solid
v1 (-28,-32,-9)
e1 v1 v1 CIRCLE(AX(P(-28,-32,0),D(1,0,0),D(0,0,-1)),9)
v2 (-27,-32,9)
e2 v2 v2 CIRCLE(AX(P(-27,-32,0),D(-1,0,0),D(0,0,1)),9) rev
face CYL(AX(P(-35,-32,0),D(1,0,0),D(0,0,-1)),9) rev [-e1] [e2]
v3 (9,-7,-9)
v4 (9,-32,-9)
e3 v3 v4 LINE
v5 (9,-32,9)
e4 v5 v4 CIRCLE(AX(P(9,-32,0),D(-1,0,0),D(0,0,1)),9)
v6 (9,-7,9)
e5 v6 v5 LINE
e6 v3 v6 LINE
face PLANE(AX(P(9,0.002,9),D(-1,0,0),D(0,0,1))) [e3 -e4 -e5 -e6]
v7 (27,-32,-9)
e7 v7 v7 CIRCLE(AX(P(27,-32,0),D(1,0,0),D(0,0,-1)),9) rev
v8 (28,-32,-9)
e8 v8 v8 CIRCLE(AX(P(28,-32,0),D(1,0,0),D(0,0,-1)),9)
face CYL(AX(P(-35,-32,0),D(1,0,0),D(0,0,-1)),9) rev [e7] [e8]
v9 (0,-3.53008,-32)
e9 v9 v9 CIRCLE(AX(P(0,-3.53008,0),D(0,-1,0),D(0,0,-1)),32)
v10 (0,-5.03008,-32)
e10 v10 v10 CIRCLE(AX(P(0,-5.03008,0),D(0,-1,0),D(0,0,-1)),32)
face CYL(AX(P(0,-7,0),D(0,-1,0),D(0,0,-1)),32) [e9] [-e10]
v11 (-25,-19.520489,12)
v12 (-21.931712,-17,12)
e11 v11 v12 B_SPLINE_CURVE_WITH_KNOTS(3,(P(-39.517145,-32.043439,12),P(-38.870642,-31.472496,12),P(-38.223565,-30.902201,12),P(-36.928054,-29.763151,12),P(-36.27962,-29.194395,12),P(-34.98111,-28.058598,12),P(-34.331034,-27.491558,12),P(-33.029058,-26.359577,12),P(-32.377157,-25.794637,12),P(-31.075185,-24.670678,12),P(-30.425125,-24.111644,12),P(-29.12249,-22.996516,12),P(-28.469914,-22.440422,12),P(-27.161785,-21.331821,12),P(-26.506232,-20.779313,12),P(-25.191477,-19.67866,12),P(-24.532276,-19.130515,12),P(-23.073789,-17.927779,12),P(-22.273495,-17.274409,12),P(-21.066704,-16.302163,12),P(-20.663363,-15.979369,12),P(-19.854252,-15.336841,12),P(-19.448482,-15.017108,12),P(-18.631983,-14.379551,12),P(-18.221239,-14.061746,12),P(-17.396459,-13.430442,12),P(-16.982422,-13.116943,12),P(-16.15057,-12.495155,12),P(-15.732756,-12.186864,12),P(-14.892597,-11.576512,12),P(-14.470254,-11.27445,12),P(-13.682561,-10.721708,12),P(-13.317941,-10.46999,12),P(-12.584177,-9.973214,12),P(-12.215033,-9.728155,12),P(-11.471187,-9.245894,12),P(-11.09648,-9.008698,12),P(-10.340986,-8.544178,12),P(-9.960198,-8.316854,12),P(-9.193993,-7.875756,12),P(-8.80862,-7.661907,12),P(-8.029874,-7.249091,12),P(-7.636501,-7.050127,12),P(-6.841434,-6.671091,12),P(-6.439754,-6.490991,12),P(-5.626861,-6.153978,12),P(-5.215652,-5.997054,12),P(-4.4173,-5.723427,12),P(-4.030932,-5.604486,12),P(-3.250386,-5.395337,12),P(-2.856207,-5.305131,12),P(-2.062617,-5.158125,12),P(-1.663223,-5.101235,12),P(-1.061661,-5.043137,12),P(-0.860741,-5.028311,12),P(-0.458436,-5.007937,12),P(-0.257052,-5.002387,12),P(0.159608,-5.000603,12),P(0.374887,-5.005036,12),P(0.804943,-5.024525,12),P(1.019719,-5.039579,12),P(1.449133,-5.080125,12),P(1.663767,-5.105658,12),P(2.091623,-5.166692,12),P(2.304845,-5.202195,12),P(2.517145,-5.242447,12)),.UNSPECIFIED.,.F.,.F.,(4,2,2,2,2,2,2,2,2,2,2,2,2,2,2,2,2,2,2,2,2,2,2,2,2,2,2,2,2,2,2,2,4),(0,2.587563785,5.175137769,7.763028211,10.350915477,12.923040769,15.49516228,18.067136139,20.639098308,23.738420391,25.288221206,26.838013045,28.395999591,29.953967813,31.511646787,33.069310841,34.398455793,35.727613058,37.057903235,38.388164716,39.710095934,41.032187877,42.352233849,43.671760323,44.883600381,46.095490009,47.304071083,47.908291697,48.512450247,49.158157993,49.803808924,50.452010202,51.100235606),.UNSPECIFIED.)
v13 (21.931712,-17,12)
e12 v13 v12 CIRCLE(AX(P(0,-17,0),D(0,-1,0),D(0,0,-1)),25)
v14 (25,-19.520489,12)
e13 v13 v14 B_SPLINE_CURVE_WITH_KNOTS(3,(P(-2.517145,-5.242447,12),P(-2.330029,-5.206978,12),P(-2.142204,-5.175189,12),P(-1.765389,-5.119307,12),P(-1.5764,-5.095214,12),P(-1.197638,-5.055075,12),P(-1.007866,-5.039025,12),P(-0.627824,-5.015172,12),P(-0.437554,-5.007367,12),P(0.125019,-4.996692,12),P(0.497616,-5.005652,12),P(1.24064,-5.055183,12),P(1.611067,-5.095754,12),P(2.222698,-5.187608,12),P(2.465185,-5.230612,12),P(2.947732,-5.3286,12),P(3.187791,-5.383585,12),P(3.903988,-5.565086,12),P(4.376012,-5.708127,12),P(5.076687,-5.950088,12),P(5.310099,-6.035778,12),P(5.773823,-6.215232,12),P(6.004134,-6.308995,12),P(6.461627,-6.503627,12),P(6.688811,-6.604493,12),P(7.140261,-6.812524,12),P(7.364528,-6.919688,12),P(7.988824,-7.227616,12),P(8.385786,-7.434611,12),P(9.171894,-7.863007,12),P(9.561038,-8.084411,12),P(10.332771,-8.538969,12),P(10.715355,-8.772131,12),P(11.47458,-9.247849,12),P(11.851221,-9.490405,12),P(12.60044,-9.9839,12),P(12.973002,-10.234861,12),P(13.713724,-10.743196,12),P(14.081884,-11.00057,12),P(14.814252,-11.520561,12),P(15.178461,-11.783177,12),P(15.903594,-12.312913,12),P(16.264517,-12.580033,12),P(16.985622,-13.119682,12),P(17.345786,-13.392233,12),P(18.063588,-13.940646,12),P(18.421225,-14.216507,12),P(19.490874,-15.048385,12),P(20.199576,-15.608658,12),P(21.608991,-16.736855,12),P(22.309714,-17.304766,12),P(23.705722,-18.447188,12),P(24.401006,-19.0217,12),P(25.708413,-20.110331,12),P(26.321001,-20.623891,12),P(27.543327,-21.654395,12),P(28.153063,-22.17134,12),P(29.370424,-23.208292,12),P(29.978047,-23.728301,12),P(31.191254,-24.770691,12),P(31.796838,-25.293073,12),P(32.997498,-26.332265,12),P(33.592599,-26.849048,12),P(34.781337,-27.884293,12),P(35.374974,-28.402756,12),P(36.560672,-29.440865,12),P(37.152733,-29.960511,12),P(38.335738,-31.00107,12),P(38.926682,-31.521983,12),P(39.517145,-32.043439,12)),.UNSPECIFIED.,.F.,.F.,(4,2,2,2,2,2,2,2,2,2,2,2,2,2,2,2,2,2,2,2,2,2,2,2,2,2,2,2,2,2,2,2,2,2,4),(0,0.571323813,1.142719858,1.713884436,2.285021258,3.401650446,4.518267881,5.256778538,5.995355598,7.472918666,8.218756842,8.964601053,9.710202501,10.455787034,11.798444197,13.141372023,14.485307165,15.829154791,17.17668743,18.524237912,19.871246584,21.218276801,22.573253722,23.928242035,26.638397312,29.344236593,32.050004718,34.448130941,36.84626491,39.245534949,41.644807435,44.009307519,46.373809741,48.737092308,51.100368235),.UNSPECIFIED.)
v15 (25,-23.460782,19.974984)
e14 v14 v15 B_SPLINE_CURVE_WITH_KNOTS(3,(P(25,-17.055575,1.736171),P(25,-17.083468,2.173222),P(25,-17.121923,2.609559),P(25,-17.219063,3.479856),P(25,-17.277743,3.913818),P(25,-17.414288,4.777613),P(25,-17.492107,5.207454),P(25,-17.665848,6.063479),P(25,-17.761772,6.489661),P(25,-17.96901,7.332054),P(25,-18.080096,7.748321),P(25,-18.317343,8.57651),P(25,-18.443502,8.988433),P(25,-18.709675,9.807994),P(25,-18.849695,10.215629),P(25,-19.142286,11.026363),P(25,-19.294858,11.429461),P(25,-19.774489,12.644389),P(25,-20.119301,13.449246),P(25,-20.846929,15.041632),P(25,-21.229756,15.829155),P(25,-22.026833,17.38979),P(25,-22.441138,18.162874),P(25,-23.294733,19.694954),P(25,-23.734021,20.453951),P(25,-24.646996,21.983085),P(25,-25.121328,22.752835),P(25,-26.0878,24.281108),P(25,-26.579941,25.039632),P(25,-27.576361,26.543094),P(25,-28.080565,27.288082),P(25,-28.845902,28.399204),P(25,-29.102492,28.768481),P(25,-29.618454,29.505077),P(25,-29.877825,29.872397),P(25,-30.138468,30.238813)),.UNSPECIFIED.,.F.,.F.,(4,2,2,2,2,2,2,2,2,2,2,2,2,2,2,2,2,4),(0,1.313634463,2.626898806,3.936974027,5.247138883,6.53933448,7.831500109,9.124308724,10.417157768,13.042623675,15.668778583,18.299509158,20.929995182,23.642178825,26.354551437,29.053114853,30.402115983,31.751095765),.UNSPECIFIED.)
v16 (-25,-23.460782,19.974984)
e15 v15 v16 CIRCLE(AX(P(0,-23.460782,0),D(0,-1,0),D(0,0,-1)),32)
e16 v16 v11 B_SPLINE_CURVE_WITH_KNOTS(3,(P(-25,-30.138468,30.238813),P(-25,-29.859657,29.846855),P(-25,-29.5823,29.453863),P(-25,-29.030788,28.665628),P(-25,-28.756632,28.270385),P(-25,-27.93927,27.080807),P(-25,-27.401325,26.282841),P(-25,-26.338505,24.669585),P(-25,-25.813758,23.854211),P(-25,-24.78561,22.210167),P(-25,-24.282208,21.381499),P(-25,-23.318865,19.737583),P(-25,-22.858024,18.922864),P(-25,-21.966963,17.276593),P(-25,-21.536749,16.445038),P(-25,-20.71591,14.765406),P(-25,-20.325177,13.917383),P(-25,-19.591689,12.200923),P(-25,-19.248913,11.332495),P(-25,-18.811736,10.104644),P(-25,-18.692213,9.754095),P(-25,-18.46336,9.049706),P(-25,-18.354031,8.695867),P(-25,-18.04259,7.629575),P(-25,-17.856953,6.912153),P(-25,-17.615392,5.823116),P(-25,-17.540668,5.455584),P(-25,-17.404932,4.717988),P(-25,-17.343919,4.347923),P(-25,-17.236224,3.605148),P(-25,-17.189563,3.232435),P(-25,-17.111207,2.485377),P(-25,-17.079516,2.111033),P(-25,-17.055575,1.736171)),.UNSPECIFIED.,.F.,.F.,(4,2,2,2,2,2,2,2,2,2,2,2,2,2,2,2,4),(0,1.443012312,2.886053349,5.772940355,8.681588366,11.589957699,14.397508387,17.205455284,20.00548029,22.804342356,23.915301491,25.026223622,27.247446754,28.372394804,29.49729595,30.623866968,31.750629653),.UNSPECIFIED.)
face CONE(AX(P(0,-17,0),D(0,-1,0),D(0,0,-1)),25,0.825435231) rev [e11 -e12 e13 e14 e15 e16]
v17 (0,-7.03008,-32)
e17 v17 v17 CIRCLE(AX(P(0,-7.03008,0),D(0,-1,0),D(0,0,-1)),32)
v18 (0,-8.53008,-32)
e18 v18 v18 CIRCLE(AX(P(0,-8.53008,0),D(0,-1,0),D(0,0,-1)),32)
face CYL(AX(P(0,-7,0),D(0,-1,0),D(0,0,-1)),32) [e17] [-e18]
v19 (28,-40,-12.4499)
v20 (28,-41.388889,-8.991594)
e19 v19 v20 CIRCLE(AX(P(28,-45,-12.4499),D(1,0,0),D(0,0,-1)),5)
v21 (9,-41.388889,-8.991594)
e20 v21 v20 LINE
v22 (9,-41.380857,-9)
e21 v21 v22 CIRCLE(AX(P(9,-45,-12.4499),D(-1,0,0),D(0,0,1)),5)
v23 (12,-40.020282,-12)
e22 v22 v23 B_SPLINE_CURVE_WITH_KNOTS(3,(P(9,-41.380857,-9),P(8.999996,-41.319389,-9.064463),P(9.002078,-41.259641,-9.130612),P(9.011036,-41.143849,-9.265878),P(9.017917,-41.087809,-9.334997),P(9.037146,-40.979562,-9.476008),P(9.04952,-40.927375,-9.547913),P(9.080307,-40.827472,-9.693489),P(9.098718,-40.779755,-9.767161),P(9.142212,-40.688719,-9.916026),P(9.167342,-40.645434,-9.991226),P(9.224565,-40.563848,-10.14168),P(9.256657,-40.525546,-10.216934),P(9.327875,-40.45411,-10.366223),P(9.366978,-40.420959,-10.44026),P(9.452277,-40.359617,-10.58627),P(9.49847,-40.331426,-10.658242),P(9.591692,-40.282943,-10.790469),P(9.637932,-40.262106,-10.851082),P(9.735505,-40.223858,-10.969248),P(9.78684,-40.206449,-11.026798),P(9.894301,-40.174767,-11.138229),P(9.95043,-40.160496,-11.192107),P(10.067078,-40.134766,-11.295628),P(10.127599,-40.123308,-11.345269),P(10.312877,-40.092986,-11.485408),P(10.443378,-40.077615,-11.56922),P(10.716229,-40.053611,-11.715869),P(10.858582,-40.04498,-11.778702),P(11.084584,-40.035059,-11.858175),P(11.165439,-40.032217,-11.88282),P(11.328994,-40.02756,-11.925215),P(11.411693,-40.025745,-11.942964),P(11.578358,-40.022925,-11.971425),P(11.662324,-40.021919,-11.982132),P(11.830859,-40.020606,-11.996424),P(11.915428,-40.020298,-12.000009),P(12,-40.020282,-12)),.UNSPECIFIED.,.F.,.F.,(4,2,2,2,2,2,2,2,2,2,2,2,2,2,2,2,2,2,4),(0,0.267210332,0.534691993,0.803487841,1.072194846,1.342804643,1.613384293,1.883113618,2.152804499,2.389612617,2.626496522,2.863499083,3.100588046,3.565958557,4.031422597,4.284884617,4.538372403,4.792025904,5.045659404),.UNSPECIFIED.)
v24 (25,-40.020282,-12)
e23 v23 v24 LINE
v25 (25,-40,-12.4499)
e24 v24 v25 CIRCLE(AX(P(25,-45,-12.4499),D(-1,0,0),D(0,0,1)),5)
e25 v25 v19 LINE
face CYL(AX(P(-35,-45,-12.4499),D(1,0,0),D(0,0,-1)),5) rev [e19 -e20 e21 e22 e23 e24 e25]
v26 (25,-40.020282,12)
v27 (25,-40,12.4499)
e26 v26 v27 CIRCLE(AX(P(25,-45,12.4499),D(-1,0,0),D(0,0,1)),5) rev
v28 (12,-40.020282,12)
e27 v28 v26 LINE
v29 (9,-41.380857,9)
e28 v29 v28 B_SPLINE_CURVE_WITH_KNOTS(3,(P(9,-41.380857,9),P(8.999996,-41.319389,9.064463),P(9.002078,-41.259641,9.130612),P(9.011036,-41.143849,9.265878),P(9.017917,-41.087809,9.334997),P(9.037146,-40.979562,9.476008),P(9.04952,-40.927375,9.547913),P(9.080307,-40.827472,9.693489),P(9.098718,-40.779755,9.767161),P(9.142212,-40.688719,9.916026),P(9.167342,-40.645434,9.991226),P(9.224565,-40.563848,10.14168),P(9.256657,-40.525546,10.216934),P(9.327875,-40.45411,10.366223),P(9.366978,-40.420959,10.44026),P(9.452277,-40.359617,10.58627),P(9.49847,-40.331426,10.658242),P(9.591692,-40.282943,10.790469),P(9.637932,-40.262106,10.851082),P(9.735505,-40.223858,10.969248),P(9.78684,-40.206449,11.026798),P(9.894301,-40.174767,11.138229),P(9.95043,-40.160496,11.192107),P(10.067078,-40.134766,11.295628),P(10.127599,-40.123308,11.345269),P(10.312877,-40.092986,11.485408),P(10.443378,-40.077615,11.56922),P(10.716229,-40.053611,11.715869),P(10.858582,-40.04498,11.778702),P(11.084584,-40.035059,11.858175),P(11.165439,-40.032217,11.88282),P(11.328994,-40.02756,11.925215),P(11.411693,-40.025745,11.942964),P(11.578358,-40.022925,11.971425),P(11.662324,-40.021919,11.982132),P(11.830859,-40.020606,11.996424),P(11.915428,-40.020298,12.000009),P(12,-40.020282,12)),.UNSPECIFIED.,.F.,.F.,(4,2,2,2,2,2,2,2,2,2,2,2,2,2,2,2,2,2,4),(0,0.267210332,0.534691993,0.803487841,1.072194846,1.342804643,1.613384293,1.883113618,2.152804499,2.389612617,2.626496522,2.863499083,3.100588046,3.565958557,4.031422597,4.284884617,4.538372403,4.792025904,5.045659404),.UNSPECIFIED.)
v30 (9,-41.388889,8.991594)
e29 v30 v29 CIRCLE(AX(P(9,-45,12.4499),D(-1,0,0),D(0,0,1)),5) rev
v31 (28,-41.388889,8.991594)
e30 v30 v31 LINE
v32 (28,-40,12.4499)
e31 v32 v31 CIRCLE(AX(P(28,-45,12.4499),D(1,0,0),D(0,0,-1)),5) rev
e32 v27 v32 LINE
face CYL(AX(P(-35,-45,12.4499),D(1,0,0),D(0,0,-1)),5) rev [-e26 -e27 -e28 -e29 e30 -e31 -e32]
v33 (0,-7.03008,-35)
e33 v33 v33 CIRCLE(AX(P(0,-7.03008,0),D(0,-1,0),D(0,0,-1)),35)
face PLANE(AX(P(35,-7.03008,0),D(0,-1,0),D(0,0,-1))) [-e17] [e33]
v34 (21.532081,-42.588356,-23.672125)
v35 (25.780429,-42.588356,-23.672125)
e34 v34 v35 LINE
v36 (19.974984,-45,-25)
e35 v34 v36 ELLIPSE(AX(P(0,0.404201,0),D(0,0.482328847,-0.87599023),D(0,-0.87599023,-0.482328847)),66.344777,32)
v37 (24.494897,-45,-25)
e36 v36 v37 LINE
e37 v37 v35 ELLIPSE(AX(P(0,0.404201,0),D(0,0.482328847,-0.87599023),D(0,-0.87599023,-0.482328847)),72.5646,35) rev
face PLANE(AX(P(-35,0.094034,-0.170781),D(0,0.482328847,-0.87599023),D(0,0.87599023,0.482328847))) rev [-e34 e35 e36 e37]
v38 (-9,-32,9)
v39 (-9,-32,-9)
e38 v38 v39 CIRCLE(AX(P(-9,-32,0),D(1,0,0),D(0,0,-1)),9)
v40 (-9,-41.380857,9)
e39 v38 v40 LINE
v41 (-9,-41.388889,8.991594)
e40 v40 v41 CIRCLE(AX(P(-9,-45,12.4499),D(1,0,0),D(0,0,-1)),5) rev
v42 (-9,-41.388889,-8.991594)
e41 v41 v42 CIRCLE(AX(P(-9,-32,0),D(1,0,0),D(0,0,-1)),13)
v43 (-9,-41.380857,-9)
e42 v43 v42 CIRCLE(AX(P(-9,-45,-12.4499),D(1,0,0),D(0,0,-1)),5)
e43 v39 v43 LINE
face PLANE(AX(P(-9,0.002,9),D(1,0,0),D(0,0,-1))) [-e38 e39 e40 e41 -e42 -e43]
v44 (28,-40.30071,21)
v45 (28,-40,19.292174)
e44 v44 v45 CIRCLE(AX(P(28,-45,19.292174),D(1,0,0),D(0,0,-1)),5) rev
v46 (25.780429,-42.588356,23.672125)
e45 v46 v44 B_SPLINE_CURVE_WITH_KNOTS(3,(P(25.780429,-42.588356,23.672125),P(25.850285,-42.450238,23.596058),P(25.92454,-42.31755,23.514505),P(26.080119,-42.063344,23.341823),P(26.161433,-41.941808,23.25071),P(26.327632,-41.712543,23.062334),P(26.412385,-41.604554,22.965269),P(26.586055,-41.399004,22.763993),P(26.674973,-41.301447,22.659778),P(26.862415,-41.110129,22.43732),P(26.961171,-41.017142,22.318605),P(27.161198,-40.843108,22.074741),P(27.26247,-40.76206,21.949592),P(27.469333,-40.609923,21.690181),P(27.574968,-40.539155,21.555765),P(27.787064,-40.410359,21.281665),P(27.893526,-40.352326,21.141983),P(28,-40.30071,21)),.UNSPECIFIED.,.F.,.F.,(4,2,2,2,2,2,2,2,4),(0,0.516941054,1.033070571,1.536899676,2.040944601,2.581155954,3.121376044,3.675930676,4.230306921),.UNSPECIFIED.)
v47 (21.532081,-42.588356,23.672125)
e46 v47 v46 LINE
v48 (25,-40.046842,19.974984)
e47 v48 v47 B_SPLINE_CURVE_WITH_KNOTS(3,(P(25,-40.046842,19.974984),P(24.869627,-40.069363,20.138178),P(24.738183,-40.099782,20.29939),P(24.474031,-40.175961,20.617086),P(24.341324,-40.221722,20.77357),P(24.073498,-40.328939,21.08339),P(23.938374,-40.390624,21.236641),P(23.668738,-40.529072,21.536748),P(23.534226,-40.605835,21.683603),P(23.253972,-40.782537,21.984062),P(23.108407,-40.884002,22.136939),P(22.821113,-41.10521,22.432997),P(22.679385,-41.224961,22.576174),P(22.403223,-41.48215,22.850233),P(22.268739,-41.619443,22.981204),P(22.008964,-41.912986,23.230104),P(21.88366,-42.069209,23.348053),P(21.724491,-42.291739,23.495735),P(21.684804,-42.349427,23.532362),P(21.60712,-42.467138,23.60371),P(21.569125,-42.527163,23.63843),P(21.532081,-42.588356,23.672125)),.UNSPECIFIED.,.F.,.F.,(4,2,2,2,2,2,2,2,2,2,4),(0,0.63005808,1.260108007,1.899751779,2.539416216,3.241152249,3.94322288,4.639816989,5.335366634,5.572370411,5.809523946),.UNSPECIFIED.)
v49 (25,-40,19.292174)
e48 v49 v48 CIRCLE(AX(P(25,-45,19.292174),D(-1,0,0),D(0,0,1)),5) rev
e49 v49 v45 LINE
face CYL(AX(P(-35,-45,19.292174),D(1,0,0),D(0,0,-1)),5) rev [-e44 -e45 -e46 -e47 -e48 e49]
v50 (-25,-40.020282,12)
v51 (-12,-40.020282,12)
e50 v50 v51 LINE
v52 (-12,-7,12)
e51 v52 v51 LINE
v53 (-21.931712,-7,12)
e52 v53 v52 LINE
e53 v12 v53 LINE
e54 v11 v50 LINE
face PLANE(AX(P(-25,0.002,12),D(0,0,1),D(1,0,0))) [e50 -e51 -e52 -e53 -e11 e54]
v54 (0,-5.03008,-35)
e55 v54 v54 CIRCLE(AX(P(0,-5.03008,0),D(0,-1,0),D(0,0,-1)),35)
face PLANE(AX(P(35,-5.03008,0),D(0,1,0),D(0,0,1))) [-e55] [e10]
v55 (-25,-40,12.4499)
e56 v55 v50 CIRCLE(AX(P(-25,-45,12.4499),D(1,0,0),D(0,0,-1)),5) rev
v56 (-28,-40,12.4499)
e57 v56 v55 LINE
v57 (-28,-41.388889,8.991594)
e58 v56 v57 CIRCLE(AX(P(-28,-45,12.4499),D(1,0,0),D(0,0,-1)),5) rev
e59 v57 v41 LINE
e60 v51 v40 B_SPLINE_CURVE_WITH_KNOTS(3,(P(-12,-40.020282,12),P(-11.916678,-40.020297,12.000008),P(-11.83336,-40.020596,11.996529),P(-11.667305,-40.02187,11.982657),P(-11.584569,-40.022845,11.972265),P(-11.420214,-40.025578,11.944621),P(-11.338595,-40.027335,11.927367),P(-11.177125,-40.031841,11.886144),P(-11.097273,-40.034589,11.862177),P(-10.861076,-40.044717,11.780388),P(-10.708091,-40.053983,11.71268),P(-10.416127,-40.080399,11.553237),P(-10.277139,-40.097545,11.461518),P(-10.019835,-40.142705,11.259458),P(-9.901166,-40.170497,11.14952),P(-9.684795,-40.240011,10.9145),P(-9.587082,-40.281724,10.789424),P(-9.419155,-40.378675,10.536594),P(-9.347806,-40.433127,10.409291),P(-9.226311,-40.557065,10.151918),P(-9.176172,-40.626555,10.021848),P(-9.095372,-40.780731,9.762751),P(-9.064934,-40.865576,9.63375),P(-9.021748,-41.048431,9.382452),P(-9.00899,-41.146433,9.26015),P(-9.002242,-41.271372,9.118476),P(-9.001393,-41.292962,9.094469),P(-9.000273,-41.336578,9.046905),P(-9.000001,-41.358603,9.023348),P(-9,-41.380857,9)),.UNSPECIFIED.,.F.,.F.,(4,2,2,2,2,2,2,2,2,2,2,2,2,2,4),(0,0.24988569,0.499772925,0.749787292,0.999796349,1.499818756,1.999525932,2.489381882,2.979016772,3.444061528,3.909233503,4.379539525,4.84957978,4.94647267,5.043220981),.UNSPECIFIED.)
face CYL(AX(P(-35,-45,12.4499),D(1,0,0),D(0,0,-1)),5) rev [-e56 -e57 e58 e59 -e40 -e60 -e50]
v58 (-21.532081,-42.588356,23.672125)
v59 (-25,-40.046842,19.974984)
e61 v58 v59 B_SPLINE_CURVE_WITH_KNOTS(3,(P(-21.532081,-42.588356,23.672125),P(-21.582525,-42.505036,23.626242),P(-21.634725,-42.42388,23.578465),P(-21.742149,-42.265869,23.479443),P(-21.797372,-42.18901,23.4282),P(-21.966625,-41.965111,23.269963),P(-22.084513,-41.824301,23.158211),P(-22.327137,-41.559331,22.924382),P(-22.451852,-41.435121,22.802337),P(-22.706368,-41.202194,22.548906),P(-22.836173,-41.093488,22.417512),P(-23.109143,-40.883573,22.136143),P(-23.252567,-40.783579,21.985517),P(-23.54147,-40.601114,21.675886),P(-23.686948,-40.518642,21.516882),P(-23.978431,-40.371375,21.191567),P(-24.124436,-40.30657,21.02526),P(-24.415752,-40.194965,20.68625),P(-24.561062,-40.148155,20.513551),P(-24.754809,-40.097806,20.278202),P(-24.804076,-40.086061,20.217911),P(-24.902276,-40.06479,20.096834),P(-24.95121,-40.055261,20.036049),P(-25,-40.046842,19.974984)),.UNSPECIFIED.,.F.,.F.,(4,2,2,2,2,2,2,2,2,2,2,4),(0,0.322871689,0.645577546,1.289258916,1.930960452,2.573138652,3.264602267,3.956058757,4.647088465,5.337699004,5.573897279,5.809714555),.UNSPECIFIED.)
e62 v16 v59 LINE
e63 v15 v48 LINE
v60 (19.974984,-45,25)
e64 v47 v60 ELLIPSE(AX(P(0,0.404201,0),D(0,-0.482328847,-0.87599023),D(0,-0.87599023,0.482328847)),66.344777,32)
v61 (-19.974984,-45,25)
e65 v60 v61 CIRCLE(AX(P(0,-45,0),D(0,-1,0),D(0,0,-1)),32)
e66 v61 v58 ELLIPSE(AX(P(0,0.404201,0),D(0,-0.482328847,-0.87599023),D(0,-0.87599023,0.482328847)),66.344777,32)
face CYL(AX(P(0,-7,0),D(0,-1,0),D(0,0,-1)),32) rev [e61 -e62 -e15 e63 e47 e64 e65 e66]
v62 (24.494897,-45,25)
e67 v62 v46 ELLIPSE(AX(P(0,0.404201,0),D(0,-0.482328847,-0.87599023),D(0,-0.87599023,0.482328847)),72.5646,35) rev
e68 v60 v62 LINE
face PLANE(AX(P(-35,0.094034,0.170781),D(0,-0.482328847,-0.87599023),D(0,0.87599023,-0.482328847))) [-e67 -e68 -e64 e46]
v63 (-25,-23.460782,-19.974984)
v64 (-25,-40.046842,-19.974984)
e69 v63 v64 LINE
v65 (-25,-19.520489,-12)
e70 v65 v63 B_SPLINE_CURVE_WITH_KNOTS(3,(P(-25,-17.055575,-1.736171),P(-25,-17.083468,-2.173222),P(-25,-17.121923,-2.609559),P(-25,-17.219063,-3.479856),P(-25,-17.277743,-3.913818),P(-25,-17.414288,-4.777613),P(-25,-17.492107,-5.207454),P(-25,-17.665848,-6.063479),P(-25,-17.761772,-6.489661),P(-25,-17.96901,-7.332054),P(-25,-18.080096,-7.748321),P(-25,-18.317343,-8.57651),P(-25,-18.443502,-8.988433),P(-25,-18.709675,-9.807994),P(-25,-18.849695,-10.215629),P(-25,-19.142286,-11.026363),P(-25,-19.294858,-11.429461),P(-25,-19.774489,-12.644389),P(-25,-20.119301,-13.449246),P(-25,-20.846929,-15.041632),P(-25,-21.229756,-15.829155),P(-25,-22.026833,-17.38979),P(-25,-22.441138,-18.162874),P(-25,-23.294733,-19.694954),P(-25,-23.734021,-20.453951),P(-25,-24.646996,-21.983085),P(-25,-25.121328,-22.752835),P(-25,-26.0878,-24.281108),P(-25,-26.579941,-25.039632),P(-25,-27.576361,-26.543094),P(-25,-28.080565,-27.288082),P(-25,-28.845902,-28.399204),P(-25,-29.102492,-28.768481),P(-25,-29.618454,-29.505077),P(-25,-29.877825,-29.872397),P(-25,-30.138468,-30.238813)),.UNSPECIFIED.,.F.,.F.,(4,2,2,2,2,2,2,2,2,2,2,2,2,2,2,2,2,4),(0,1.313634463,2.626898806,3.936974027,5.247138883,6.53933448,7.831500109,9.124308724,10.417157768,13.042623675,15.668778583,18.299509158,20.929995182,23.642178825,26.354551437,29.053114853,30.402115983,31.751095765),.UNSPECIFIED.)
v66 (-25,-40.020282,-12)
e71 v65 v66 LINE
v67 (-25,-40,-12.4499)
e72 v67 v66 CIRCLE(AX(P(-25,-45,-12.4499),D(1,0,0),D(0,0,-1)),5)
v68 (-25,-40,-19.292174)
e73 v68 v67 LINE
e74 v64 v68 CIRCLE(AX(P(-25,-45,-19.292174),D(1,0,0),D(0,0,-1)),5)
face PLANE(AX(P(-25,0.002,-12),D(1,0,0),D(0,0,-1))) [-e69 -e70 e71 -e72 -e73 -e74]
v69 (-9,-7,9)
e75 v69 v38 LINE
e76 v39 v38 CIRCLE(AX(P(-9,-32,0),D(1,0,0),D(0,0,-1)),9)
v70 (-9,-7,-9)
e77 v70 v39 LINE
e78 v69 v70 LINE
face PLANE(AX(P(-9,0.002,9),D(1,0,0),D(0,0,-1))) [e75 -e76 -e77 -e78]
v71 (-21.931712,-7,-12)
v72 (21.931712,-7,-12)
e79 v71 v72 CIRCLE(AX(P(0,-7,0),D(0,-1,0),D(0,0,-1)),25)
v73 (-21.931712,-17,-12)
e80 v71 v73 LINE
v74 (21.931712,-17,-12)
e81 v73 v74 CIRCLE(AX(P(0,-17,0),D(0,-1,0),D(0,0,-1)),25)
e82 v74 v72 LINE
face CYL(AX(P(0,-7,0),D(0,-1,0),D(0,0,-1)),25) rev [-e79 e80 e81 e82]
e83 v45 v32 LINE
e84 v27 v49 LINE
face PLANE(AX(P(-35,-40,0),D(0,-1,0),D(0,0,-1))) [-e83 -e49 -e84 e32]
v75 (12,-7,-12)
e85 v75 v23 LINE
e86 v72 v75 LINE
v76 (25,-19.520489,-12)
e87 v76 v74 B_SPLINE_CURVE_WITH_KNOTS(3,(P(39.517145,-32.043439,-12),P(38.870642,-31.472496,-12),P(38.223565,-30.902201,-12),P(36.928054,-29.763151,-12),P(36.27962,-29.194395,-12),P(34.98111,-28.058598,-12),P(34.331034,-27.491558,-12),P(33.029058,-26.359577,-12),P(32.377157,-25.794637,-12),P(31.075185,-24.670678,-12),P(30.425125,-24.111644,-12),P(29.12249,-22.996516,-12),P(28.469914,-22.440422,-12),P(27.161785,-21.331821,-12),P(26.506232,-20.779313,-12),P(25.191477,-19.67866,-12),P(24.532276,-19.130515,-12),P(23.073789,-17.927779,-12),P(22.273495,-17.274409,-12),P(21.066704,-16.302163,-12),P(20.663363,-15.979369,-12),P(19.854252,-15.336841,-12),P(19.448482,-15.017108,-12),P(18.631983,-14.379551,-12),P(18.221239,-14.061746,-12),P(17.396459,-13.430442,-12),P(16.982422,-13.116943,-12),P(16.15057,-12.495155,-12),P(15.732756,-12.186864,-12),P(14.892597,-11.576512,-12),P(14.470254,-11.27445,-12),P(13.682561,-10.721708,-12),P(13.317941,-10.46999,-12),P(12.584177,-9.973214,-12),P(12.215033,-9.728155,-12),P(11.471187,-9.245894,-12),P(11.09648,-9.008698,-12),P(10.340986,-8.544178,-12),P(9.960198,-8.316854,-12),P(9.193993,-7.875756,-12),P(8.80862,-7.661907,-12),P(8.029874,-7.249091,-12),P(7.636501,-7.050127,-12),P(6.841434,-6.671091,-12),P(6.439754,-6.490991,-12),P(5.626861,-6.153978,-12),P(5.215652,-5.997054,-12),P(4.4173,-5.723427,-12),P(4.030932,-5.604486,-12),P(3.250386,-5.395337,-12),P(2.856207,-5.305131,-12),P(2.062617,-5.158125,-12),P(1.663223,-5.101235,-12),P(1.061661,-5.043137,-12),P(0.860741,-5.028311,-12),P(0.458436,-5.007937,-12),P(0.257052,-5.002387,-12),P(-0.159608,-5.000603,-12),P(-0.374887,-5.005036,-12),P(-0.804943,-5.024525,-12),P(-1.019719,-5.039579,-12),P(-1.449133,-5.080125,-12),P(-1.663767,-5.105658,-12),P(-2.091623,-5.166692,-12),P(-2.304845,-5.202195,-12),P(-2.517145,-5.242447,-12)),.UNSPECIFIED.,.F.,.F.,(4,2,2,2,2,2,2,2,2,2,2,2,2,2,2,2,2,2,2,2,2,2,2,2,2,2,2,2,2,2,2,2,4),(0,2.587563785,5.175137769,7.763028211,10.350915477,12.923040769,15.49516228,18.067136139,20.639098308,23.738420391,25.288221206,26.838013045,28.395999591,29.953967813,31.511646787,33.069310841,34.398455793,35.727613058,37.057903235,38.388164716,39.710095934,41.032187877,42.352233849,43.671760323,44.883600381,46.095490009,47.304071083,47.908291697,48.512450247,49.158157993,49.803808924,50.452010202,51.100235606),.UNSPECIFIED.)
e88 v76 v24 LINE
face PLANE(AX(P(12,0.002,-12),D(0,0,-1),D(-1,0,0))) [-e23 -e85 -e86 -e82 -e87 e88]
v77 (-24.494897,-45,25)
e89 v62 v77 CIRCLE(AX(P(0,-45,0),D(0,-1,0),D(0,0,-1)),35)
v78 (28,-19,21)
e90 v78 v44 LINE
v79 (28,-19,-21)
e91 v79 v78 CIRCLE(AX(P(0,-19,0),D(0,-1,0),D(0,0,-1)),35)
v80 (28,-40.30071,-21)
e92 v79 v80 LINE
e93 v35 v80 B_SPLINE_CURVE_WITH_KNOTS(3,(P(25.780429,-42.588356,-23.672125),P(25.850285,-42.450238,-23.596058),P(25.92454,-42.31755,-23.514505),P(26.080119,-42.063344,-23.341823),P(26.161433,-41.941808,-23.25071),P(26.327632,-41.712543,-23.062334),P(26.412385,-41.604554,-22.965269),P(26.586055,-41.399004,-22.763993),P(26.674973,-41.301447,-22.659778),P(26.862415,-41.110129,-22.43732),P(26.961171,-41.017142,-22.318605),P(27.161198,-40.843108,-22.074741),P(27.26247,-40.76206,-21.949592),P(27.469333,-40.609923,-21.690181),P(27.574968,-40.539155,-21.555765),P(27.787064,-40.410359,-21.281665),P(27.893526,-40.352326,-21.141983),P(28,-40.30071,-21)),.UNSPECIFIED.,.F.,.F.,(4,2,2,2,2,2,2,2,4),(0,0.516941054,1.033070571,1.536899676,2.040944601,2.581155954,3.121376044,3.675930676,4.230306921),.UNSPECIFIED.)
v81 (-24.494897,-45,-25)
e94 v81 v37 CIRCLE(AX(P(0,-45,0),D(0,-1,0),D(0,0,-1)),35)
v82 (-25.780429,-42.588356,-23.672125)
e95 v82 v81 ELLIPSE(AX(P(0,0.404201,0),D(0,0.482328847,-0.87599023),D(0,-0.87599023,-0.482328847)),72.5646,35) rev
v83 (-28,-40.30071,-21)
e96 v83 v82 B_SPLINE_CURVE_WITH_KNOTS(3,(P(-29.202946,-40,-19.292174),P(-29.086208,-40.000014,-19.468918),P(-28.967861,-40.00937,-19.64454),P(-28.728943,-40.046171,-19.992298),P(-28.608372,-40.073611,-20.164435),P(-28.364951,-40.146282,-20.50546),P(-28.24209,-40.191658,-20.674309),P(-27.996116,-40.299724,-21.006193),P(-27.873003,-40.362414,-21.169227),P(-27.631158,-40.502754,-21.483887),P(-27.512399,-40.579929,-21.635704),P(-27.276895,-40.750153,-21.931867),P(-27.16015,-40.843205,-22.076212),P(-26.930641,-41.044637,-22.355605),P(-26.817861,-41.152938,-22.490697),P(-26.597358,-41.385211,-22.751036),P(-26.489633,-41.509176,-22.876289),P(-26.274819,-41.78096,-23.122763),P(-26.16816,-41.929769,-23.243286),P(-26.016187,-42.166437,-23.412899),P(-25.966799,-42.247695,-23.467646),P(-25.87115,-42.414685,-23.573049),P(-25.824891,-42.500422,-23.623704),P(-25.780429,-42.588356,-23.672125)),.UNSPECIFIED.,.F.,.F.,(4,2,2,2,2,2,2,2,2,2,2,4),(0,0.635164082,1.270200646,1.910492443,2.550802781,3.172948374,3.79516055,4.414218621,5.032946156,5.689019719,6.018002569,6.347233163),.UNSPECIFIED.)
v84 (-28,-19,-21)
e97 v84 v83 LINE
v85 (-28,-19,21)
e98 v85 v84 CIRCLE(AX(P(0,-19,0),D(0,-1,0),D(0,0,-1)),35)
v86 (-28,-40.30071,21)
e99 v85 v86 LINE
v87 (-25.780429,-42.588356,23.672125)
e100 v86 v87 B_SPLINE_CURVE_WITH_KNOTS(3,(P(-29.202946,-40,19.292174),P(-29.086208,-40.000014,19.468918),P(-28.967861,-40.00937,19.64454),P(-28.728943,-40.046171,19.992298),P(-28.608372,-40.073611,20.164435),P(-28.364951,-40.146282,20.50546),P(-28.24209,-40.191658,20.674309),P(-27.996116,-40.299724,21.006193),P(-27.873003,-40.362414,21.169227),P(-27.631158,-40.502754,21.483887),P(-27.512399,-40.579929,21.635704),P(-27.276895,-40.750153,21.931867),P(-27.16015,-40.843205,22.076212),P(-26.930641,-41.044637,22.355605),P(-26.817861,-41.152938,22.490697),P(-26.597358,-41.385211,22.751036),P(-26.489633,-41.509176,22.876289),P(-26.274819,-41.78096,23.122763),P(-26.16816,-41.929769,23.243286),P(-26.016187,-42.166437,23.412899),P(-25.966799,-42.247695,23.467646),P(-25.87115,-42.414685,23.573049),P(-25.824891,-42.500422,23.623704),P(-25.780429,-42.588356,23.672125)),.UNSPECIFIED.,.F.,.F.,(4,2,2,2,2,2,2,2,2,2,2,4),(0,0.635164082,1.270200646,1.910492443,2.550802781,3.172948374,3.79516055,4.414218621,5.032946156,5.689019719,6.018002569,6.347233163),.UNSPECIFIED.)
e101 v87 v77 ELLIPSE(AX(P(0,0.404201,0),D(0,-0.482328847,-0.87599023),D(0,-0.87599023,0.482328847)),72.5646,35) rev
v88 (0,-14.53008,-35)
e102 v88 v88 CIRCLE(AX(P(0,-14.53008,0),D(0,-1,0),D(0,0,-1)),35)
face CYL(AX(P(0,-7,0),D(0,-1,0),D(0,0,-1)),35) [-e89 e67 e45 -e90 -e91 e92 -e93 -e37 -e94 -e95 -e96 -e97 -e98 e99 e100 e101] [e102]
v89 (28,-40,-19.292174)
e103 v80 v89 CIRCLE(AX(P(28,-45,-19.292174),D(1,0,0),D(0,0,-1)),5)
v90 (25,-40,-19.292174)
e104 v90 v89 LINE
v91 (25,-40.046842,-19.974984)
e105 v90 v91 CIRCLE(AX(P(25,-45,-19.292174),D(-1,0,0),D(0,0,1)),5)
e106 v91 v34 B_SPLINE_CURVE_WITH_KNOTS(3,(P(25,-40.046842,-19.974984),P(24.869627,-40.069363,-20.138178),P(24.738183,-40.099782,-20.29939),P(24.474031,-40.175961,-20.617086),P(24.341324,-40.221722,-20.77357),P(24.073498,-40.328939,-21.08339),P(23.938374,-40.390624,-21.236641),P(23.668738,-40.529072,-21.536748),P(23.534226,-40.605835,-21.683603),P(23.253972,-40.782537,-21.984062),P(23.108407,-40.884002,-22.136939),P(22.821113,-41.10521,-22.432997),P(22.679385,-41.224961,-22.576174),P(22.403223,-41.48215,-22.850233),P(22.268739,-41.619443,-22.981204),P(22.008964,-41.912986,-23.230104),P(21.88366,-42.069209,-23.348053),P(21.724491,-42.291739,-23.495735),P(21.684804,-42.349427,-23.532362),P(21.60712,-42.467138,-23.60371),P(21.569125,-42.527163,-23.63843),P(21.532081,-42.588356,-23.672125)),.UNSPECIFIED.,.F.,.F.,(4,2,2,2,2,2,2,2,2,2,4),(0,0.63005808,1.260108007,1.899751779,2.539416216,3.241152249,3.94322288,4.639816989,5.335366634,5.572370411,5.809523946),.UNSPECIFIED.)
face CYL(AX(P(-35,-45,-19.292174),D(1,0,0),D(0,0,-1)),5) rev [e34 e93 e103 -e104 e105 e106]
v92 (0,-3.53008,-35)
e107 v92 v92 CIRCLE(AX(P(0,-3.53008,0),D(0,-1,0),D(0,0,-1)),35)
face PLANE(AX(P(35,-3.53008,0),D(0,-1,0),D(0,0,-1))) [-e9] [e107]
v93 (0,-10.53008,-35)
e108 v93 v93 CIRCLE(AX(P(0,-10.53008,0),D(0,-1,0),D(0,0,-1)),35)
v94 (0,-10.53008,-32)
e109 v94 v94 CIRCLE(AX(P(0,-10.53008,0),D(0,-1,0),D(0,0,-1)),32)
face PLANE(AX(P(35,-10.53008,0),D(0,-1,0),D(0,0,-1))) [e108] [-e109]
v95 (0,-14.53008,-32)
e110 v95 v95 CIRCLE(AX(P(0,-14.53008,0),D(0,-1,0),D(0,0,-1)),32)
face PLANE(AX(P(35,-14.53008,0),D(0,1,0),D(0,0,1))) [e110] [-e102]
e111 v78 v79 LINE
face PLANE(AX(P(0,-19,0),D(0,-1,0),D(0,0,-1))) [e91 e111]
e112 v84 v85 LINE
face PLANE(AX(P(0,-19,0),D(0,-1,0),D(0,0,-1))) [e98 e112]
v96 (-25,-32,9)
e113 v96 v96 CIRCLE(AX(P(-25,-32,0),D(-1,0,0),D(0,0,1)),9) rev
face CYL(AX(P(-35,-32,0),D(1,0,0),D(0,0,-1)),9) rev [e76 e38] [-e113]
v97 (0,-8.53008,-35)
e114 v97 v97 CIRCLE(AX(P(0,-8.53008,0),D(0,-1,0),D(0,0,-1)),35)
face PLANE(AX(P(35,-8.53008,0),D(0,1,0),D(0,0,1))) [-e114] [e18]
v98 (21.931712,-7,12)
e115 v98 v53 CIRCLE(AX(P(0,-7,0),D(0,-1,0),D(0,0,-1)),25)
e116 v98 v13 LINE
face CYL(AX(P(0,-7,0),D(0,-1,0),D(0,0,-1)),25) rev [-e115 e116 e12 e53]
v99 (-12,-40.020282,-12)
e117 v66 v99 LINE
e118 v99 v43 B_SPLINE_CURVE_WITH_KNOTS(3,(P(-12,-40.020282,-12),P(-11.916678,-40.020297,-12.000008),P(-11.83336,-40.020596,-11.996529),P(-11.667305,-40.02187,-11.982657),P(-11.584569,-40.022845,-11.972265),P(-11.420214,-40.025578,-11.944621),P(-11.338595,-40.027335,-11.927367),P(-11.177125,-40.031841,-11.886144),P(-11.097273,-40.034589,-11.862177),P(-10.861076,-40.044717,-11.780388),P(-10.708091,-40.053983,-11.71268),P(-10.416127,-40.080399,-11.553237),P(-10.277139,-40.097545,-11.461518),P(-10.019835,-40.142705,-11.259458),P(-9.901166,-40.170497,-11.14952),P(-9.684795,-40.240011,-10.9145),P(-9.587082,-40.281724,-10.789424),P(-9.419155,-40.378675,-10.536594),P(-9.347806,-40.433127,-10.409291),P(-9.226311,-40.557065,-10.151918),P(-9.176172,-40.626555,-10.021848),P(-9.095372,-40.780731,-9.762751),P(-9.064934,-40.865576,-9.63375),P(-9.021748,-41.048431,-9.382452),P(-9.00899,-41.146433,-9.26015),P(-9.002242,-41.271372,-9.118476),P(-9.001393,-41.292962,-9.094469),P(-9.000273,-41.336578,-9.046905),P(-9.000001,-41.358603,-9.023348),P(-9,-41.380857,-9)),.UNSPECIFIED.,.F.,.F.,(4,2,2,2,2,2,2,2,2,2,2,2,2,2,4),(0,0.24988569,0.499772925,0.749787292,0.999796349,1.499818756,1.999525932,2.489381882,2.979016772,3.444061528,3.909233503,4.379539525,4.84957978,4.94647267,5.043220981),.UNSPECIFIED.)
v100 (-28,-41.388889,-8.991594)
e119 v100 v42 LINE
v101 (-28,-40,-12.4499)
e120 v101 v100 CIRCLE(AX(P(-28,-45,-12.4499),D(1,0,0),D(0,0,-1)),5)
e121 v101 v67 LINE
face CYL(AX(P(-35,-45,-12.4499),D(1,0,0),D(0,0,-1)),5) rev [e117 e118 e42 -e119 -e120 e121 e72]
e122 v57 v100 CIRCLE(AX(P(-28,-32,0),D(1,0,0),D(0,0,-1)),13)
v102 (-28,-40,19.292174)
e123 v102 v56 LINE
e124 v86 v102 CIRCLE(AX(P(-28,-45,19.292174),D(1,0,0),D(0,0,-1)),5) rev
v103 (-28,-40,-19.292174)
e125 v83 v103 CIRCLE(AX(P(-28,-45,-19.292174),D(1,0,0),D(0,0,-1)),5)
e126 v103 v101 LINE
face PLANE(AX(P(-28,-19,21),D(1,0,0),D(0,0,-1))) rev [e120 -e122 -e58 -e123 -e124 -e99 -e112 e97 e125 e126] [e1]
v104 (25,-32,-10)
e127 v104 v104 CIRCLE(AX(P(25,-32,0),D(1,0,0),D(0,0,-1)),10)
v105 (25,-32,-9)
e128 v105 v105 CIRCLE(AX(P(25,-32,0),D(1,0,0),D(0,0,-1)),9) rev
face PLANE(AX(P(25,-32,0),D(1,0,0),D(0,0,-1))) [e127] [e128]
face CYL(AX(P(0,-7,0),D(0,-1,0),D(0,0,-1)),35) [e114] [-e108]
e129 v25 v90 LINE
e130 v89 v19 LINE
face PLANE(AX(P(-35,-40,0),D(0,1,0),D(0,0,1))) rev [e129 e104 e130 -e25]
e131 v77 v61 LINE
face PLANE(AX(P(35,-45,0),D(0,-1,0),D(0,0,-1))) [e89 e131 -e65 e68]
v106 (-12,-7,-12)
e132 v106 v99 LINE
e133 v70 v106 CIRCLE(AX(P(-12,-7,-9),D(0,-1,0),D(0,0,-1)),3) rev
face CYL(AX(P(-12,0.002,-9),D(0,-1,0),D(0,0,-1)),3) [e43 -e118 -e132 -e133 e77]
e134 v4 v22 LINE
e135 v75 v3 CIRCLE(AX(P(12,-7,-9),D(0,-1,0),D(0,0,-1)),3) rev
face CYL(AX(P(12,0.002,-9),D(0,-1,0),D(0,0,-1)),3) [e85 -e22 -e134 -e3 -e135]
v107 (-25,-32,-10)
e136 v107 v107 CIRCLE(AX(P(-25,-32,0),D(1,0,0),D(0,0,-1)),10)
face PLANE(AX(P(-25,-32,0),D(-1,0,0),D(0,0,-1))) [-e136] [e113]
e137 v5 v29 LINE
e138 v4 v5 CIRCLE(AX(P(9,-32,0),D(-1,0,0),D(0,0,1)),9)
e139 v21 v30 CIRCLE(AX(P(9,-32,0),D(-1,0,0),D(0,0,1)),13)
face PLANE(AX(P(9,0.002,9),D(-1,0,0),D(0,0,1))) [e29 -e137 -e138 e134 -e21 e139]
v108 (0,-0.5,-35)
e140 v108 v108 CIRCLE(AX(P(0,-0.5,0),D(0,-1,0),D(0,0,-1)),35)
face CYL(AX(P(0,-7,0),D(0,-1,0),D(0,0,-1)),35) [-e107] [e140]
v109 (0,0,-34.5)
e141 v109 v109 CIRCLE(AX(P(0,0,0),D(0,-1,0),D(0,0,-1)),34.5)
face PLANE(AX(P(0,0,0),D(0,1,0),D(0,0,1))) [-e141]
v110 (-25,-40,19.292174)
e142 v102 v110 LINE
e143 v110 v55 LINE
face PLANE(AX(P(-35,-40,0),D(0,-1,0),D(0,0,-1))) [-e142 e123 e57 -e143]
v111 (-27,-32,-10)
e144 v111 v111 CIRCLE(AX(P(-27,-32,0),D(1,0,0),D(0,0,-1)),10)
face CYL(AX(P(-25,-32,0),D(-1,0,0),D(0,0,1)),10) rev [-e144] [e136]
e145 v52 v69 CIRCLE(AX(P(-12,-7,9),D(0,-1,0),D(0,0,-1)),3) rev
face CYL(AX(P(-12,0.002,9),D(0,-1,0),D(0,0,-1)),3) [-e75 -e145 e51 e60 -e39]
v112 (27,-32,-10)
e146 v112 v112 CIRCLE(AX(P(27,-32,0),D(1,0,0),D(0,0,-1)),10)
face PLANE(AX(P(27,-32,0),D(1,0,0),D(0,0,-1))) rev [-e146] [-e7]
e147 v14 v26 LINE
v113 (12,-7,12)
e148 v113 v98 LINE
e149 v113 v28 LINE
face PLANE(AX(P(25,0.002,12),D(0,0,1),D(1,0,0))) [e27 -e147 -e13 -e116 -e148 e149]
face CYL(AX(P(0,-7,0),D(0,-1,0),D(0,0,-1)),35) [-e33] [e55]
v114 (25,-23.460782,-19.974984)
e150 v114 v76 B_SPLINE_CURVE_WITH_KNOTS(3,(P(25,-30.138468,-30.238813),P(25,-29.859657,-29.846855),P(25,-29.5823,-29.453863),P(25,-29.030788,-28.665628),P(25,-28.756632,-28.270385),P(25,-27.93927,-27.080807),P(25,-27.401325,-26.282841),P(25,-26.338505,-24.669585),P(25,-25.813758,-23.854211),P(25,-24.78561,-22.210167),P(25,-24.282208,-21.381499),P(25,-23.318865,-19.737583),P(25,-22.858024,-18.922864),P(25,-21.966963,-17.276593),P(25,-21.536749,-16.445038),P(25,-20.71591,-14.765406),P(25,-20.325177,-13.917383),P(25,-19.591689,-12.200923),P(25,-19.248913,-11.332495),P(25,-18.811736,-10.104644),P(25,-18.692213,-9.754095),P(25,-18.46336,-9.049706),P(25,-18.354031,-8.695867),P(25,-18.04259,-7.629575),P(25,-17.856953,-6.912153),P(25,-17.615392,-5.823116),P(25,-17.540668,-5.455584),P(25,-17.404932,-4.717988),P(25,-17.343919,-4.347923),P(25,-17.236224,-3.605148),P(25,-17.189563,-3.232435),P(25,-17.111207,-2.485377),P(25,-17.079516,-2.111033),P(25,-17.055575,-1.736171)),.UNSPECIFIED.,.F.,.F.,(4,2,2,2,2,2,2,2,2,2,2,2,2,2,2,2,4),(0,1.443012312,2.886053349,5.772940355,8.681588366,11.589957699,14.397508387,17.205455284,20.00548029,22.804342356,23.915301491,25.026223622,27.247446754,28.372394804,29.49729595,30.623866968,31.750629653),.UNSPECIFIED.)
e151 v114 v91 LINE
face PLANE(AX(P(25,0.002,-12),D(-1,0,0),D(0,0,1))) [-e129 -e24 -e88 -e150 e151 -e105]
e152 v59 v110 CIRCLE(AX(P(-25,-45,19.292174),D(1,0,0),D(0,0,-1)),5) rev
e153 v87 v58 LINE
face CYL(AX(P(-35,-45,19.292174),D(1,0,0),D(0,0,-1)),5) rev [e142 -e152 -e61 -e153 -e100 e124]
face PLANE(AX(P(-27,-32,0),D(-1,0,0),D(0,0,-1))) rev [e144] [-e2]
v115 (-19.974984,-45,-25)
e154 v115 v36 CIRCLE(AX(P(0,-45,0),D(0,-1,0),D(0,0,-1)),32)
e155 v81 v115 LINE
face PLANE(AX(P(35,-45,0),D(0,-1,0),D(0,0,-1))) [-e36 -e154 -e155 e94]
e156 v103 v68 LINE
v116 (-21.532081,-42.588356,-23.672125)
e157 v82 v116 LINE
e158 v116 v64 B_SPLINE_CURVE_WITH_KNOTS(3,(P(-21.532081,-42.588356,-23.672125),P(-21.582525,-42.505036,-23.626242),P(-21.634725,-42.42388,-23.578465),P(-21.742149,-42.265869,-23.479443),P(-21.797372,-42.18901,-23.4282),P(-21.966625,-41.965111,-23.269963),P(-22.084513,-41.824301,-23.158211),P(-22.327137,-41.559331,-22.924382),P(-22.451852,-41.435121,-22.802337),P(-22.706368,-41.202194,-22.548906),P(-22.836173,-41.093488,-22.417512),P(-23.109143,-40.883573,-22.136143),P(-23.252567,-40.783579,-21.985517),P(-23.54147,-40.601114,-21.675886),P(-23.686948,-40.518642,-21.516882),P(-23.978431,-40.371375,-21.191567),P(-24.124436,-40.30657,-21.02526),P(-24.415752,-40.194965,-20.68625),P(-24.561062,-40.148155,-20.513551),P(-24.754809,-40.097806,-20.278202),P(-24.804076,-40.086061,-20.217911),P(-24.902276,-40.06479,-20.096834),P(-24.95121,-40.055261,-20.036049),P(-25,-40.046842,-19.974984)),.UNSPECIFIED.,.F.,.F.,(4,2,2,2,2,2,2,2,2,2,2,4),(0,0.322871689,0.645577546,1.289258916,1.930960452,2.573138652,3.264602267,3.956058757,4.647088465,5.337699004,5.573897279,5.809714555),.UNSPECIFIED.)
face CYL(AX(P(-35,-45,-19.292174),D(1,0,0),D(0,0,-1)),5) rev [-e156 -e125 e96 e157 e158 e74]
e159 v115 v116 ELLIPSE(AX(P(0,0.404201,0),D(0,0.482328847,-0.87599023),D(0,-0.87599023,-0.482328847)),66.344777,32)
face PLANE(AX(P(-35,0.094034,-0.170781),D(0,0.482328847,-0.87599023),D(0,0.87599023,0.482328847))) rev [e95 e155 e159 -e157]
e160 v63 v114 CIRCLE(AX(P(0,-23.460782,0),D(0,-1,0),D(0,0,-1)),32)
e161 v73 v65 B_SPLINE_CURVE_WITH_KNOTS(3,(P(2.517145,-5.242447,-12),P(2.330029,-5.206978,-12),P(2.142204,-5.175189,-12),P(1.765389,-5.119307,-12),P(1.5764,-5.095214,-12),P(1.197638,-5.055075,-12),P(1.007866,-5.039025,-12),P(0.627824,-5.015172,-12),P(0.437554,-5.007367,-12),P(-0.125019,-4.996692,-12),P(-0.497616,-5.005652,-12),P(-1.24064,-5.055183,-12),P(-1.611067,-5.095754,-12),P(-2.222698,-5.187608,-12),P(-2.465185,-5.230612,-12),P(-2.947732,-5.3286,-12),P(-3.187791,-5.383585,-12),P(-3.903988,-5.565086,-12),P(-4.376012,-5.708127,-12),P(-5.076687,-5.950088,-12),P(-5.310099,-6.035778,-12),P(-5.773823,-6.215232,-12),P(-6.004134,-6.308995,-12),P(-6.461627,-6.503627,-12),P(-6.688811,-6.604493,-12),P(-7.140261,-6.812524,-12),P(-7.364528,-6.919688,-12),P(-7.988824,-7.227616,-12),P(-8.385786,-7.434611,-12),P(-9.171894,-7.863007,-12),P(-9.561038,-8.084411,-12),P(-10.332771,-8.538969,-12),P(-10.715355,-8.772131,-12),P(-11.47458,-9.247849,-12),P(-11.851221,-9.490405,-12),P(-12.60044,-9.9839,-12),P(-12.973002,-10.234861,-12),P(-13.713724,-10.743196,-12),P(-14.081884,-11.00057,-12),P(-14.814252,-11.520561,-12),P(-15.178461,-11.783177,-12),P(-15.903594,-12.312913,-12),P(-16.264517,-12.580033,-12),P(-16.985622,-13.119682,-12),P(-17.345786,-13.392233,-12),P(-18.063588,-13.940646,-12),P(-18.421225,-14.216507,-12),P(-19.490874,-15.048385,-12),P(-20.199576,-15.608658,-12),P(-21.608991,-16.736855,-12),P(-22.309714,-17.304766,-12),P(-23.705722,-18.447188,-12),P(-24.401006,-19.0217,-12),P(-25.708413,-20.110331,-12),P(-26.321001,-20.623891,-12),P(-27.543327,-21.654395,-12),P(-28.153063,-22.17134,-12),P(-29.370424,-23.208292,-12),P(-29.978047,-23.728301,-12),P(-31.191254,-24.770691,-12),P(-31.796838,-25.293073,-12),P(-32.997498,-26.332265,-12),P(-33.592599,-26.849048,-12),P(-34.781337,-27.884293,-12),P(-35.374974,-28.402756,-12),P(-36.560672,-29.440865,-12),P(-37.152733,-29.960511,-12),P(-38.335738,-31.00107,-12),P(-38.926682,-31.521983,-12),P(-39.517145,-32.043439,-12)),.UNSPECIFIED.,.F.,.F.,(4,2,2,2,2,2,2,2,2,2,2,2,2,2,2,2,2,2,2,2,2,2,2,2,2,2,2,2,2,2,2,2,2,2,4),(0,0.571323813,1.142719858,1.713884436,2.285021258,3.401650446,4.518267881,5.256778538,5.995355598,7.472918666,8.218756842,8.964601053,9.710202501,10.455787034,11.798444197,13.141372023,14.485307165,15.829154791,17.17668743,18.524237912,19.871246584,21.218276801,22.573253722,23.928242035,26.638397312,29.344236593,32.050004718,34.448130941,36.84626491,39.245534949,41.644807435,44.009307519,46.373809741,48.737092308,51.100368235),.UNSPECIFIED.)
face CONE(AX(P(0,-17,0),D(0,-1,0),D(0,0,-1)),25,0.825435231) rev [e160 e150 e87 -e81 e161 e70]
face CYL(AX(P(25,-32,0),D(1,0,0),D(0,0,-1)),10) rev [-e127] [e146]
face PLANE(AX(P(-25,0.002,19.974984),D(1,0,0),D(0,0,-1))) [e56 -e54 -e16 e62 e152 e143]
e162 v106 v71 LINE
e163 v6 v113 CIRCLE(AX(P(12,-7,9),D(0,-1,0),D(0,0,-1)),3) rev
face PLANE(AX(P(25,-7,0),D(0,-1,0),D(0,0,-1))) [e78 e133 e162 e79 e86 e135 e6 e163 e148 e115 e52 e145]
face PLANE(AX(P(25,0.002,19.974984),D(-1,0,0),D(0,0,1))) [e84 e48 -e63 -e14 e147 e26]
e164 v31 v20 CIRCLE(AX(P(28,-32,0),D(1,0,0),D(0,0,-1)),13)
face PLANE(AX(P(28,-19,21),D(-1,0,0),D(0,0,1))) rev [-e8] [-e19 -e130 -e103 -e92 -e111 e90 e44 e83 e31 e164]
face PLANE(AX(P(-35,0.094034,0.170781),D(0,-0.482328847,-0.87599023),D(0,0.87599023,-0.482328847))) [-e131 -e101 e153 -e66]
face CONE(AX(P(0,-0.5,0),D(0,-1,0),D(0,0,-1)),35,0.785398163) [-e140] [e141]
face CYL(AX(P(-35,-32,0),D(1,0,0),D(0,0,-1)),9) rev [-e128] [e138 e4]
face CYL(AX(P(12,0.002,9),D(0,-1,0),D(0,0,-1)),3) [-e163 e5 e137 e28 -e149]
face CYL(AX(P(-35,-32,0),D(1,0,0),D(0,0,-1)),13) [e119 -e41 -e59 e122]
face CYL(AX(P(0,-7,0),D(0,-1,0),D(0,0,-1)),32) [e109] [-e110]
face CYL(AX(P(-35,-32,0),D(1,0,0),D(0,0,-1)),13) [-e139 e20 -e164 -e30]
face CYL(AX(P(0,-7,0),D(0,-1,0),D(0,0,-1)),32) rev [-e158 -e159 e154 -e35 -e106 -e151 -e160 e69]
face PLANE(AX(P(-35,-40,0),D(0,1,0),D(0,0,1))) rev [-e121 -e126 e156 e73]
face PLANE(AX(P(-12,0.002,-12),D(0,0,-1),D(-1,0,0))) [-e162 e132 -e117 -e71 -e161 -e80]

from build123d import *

# Parameters (mm, degrees)
BOSS_EXTRUDE1_REACH     = 68.895
CUT_EXTRUDE1_DEPTH      = 67.895440801
CUT_EXTRUDE1_DEPTH_BACK = 26
SKETCH4_R               = 9
CUT_EXTRUDE5_DEPTH      = 85.964698552
CUT_EXTRUDE6_START      = -1
SKETCH5_R               = 10
CUT_EXTRUDE6_DEPTH      = 2


with BuildPart() as part:
    # Sketch1 → Revolve6 (revolve)
    with BuildSketch(Plane.XY):
        Polygon((0, 0), (34.5, 0), (35, -0.5), (35, -3.530079997), (32, -3.530079997), (32, -5.030079997), (35, -5.030079997), (35, -7.030079997), (32, -7.030079997), (32, -8.530079997), (35, -8.530079997), (35, -10.530079997), (32, -10.530079997), (32, -14.530079997), (35, -14.530079997), (35, -45), (32, -45), (32, -23.460781634), (25, -17), (25, -7), (0, -7), align=None)
    revolve(axis=Axis((0, -7, 0), (0, 1, 0)))

    # Sketch2 → Boss-Extrude1 (add, up to next)
    with BuildSketch(Plane.XZ.offset(45), mode=Mode.PRIVATE) as boss_extrude1_sk1:
        with BuildLine():
            Line((-25, 19.974984355), (-25, 12))
            Line((-25, 12), (-12, 12))
            ThreePointArc((-12, 12), (-9.878679656, 11.121320344), (-9, 9))
            Line((-9, 9), (-9, -9))
            ThreePointArc((-9, -9), (-9.878679656, -11.121320344), (-12, -12))
            Line((-12, -12), (-25, -12))
            Line((-25, -12), (-25, -19.974984355))
            ThreePointArc((-25, -19.974984355), (-32, 0), (-25, 19.974984355))
        make_face()
    boss_extrude1_tool1 = extrude(boss_extrude1_sk1.sketch, amount=-BOSS_EXTRUDE1_REACH, mode=Mode.PRIVATE) - part.part
    # Sketch2 → Boss-Extrude1 (add, up to next)
    with BuildSketch(Plane.XZ.offset(45), mode=Mode.PRIVATE) as boss_extrude1_sk2:
        with BuildLine():
            Line((25, 19.974984355), (25, 12))
            Line((25, 12), (12, 12))
            ThreePointArc((12, 12), (9.878679656, 11.121320344), (9, 9))
            Line((9, 9), (9, -9))
            ThreePointArc((9, -9), (9.878679656, -11.121320344), (12, -12))
            Line((12, -12), (25, -12))
            Line((25, -12), (25, -19.974984355))
            ThreePointArc((25, -19.974984355), (32, 0), (25, 19.974984355))
        make_face()
    boss_extrude1_tool2 = extrude(boss_extrude1_sk2.sketch, amount=-BOSS_EXTRUDE1_REACH, mode=Mode.PRIVATE) - part.part
    add(boss_extrude1_tool1.solids().sort_by_distance((-20.669877, -45, 0))[0])
    add(boss_extrude1_tool2.solids().sort_by_distance((20.669877, -45, 0))[0])

    # Sketch3 → Cut-Extrude1 (cut, two sides: drawn at the far end of the back side and taken through both)
    with BuildSketch(Plane.XZ.offset(45).offset(-CUT_EXTRUDE1_DEPTH_BACK)):
        with BuildLine():
            Line((-28, 21), (-28, -21))
            ThreePointArc((-28, -21), (-35, 0), (-28, 21))
        make_face()
        with BuildLine():
            Line((28, 21), (28, -21))
            ThreePointArc((28, -21), (35, 0), (28, 21))
        make_face()
    extrude(amount=CUT_EXTRUDE1_DEPTH + CUT_EXTRUDE1_DEPTH_BACK, mode=Mode.SUBTRACT)

    # Sketch4 → Cut-Extrude5 (cut, through all)
    with BuildSketch(Plane(origin=(28, 0, 0), x_dir=(0, 0, -1), z_dir=(1, 0, 0))):
        with Locations((0, -32)):
            Circle(SKETCH4_R)
        with BuildLine():
            ThreePointArc((8.991594154, -41.388888889), (4.844813951, -44.063489453), (0, -45))
            Line((0, -45), (25, -45))
            Line((25, -45), (23.672124938, -42.588355767))
            ThreePointArc((23.672124938, -42.588355767), (21.835968082, -40.69545466), (19.292173786, -40))
            Line((19.292173786, -40), (12.449899598, -40))
            ThreePointArc((12.449899598, -40), (10.586509617, -40.360196364), (8.991594154, -41.388888889))
        make_face()
        with BuildLine():
            Line((-25, -45), (0, -45))
            ThreePointArc((0, -45), (-4.844813951, -44.063489453), (-8.991594154, -41.388888889))
            ThreePointArc((-8.991594154, -41.388888889), (-10.586509617, -40.360196364), (-12.449899598, -40))
            Line((-12.449899598, -40), (-19.292173786, -40))
            ThreePointArc((-19.292173786, -40), (-21.835968082, -40.69545466), (-23.672124938, -42.588355767))
            Line((-23.672124938, -42.588355767), (-25, -45))
        make_face()
    extrude(amount=-CUT_EXTRUDE5_DEPTH, mode=Mode.SUBTRACT)

    # Sketch5 → Cut-Extrude6 (cut)
    with BuildSketch(Plane(origin=(28, 0, 0), x_dir=(0, 0, -1), z_dir=(1, 0, 0)).offset(CUT_EXTRUDE6_START)):
        with Locations((0, -32)):
            Circle(SKETCH5_R)
    cut_extrude6 = extrude(amount=-CUT_EXTRUDE6_DEPTH, mode=Mode.SUBTRACT)

    # Mirror1: Cut-Extrude6 across plane
    add(cut_extrude6.mirror(Plane(origin=(0, 0, 0), x_dir=(0, 0, 1), z_dir=(1, 0, 0))), mode=Mode.SUBTRACT)


solid = part.part
